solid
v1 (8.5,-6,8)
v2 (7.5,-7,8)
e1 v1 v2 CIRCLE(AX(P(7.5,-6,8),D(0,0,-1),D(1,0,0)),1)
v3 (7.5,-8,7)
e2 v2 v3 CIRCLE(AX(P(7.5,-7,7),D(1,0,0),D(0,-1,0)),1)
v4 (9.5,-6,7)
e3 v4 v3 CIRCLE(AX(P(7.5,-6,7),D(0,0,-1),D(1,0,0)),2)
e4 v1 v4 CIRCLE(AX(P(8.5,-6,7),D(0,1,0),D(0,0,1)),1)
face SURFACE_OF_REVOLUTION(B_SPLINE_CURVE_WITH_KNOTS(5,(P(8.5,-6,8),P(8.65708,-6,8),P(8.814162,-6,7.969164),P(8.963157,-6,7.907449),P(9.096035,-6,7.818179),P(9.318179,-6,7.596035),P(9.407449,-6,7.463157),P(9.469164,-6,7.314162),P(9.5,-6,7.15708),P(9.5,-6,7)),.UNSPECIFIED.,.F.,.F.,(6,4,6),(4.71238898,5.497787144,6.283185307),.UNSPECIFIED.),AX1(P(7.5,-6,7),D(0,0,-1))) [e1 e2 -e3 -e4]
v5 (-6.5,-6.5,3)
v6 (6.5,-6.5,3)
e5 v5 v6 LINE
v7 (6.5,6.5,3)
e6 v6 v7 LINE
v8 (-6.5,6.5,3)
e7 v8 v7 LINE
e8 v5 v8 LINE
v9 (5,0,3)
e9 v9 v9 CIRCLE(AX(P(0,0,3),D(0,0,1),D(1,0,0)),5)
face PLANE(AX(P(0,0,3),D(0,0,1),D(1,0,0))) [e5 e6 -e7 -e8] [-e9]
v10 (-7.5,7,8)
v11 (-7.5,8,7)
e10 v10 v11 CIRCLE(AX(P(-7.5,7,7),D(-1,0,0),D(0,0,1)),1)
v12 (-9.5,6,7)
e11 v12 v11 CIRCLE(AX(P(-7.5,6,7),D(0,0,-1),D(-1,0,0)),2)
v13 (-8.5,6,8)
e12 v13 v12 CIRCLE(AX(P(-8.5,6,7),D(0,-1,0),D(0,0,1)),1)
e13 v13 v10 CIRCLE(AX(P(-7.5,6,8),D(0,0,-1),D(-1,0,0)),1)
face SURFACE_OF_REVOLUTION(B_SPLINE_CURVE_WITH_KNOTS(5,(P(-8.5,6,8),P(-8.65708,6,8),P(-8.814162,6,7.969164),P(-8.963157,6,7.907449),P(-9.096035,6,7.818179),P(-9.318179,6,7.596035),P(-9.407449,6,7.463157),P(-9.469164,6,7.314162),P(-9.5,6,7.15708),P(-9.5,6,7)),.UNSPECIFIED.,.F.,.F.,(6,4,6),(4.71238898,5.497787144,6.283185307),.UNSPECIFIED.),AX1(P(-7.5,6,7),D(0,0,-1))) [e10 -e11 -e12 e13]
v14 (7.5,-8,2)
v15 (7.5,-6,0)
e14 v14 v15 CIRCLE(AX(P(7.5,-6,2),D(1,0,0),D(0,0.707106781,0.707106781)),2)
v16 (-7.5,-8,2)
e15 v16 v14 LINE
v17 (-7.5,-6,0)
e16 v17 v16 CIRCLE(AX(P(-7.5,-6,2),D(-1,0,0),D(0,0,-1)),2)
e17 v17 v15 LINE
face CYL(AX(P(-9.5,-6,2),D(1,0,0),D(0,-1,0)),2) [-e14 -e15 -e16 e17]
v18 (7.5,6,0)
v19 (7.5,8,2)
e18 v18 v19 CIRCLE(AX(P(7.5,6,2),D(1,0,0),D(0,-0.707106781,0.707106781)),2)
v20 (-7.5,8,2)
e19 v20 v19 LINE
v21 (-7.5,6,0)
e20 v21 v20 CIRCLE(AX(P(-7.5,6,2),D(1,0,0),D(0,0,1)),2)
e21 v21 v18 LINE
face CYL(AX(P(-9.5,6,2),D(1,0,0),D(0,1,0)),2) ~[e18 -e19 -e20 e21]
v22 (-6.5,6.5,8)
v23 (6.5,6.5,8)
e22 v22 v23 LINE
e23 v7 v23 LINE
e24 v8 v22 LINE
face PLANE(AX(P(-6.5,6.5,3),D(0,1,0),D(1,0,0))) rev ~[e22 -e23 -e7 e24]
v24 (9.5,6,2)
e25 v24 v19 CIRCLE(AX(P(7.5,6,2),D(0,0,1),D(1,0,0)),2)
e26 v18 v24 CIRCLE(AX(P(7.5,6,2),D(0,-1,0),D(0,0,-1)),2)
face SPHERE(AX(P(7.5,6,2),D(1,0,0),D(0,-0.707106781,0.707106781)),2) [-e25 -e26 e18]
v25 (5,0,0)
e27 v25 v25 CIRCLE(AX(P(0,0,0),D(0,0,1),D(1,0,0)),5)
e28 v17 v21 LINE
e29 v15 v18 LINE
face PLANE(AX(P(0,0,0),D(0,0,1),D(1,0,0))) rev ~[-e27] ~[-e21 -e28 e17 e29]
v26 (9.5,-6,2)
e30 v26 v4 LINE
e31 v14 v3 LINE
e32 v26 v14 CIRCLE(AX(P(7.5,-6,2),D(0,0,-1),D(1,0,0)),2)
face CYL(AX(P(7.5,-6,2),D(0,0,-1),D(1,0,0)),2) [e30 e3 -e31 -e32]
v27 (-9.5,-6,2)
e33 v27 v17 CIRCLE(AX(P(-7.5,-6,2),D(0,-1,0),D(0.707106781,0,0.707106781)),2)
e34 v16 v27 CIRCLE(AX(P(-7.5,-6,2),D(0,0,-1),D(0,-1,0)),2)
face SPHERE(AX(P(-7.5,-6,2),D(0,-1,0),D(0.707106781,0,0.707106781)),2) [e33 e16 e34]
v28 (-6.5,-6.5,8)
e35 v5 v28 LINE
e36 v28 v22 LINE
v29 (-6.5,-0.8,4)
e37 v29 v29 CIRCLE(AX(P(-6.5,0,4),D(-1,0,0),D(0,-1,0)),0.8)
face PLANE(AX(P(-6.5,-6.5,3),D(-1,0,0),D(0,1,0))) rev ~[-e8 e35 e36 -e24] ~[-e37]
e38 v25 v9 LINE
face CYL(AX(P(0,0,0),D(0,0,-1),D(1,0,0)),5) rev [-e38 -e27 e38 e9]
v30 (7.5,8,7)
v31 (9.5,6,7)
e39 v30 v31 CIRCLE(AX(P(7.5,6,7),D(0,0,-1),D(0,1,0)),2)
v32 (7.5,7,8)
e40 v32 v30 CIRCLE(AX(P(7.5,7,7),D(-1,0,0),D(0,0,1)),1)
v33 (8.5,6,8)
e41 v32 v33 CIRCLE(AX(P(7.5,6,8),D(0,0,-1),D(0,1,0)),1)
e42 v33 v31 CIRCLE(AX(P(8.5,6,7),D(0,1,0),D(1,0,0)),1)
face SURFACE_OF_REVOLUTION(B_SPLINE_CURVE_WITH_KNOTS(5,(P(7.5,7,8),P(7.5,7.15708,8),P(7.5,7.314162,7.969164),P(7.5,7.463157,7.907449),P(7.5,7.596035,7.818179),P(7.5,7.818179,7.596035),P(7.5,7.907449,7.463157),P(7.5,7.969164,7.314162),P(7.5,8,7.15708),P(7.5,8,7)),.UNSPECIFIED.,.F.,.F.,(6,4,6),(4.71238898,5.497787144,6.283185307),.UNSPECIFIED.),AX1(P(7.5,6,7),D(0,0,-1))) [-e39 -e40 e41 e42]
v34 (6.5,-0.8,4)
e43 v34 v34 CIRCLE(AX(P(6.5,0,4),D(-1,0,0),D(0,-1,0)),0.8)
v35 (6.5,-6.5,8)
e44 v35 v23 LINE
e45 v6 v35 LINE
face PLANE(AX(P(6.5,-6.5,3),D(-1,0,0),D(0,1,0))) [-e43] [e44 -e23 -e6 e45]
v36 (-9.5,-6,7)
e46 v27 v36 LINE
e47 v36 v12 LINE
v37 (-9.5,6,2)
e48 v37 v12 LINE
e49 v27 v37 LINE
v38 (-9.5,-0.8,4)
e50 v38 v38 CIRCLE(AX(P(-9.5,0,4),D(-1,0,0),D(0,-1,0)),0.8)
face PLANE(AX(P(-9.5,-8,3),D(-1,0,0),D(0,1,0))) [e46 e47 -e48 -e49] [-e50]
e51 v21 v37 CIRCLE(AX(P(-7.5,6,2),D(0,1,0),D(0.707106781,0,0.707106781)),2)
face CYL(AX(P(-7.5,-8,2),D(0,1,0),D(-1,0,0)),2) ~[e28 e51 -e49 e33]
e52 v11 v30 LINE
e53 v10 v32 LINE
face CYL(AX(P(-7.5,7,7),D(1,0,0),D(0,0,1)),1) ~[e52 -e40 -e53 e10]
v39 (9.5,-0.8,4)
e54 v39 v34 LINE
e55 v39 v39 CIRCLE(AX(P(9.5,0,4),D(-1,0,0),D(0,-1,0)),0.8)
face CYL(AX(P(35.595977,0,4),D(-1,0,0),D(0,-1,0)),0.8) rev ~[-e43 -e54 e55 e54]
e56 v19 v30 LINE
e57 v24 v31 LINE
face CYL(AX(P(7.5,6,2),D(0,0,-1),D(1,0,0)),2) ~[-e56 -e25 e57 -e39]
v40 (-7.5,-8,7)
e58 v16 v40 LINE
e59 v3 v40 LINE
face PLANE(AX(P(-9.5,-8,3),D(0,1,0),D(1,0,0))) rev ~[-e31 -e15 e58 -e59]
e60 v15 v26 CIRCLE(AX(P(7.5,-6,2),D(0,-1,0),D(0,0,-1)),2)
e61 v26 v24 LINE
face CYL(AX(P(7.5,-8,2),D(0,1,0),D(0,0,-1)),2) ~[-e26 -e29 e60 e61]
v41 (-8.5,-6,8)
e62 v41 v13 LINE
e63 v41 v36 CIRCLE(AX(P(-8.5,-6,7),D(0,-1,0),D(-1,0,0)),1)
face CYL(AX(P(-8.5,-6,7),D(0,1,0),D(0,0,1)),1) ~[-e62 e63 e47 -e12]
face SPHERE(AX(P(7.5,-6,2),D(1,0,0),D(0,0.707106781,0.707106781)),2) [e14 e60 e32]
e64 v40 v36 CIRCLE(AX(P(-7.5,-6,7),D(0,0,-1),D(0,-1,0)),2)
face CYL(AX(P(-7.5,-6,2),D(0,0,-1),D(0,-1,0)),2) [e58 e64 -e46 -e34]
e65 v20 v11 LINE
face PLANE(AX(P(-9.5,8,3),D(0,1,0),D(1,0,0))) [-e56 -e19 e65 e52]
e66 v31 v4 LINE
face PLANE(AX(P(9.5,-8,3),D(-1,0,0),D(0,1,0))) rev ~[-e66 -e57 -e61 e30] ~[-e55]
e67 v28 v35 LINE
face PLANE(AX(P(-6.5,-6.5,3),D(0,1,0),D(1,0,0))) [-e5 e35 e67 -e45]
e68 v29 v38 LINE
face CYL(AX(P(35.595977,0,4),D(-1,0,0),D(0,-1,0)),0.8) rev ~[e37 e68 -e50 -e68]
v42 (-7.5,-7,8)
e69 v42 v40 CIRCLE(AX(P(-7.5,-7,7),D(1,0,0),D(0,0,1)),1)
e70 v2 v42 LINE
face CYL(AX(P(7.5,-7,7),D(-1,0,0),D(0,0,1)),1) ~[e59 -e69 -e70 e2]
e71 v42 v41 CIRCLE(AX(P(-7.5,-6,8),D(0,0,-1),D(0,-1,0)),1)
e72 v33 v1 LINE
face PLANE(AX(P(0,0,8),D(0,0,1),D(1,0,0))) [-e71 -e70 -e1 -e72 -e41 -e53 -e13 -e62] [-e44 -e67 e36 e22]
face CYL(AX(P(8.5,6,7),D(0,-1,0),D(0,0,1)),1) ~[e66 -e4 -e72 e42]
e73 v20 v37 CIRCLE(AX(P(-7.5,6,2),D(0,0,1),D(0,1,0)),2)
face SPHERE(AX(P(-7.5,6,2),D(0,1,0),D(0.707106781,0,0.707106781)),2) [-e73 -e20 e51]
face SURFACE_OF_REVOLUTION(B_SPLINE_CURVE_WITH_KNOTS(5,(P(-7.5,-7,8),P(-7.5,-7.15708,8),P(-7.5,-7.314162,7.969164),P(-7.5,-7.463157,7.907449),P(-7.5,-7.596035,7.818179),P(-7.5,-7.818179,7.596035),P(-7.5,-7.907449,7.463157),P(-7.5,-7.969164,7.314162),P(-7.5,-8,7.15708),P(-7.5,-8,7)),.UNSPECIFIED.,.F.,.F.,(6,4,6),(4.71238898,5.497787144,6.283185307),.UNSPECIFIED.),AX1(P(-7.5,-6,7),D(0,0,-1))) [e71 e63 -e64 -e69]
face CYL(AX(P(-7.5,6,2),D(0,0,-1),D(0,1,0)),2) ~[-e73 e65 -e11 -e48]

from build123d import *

# Parameters (mm, degrees)
F0_W         = 19
F0_H         = 16
F0_W_2       = 13
F0_H_2       = 13
F0_R         = 5
F1_DEPTH     = 3
F2_W         = 19
F2_H         = 16
F2_W_2       = 13
F2_H_2       = 13
F3_DEPTH     = 5
F5_D         = 1.6
F6_R         = 2
F7_T1_DEPTH  = 11
F7_S5_W      = 2
F7_S5_H      = 2
F7_T6_DEPTH  = 2
F7_S11_W     = 2
F7_S11_H     = 2
F7_T12_DEPTH = 2
F7_S17_W     = 2
F7_S17_H     = 2
F7_T18_DEPTH = 2
F7_S23_W     = 2
F7_S23_H     = 2
F7_T24_DEPTH = 2
F8_R         = 1


# Not quite as in the source:
# - a fillet or chamfer that OpenCascade refuses, or shapes differently, is made with other operations: its cross-section is extruded or revolved along the edge and cut away or added


with BuildPart() as f1:
    # F0 (on Top) → F1 (new body)
    with BuildSketch(Plane.XY):
        Rectangle(F0_W, F0_H)
        Rectangle(F0_W_2, F0_H_2, mode=Mode.SUBTRACT)
        Rectangle(F0_W_2, F0_H_2)
        Circle(F0_R, mode=Mode.SUBTRACT)
    extrude(amount=F1_DEPTH)

    # F2 (on face) → F3 (join)
    with BuildSketch(Plane.XY.offset(3)):
        Rectangle(F2_W, F2_H)
        Rectangle(F2_W_2, F2_H_2, mode=Mode.SUBTRACT)
    extrude(amount=F3_DEPTH)

    # F5 (through all)
    with Locations(Plane.YZ.offset(9.5)):
        with Locations((0, 4)):
            Hole(F5_D / 2)

    # F6
    f6_edges = [f1.edges().sort_by_distance(p)[0] for p in [
        (0, -8, 0),
        (0, 8, 0),
        (-9.5, 0, 0),
        (9.5, 0, 0),
    ]]
    fillet(f6_edges, radius=F6_R)

    # F7: fillet of radius 2 on 4 edges, made by hand

    # F7_s2 → F7_t1 (cut)
    with BuildSketch(Plane.XY.offset(2)):
        with BuildLine():
            ThreePointArc((9.5, -6), (8.9142135624, -7.4142135624), (7.5, -8))
            Line((7.5, -8), (9.5, -8))
            Line((9.5, -8), (9.5, -6))
        make_face()
        with BuildLine():
            ThreePointArc((9.5, 6), (8.9142135624, 7.4142135624), (7.5, 8))
            Line((7.5, 8), (9.5, 8))
            Line((9.5, 8), (9.5, 6))
        make_face()
        with BuildLine():
            ThreePointArc((-7.5, -8), (-8.9142135624, -7.4142135624), (-9.5, -6))
            Line((-9.5, -6), (-9.5, -8))
            Line((-9.5, -8), (-7.5, -8))
        make_face()
        with BuildLine():
            ThreePointArc((-7.5, 8), (-8.9142135624, 7.4142135624), (-9.5, 6))
            Line((-9.5, 6), (-9.5, 8))
            Line((-9.5, 8), (-7.5, 8))
        make_face()
    extrude(amount=F7_T1_DEPTH, mode=Mode.SUBTRACT)


with BuildPart() as f7_tool4:
    # F7_s5 → F7_t6 (new body)
    with BuildSketch(Plane.XZ.offset(-6)):
        with Locations((-8.5, 1)):
            Rectangle(F7_S5_W, F7_S5_H)
    extrude(amount=-F7_T6_DEPTH)

    # F7_s7 → F7_t8 (revolve, cut)
    with BuildSketch(Plane(origin=(-7.5, 6, 2), x_dir=(0.7071067812, 0, 0.7071067812), z_dir=(-0.7071067812, 0, 0.7071067812))):
        with BuildLine():
            ThreePointArc((0, -2), (2, 0), (0, 2))
            Line((0, 2), (0, -2))
        make_face()
    revolve(axis=Axis((-7.5, 6, 2), (0, 1, 0)), mode=Mode.SUBTRACT)


with BuildPart() as f1_1:
    add(f1.part)

    # F7_t3: cut F7_tool4
    add(f7_tool4.part, mode=Mode.SUBTRACT)


with BuildPart() as f7_tool10:
    # F7_s11 → F7_t12 (new body)
    with BuildSketch(Plane.XZ.offset(6)):
        with Locations((-8.5, 1)):
            Rectangle(F7_S11_W, F7_S11_H)
    extrude(amount=F7_T12_DEPTH)

    # F7_s13 → F7_t14 (revolve, cut)
    with BuildSketch(Plane(origin=(-7.5, -6, 2), x_dir=(0.7071067812, 0, 0.7071067812), z_dir=(0.7071067812, 0, -0.7071067812))):
        with BuildLine():
            ThreePointArc((0, -2), (2, 0), (0, 2))
            Line((0, 2), (0, -2))
        make_face()
    revolve(axis=Axis((-7.5, -6, 2), (0, -1, 0)), mode=Mode.SUBTRACT)


with BuildPart() as f1_2:
    add(f1_1.part)

    # F7_t9: cut F7_tool10
    add(f7_tool10.part, mode=Mode.SUBTRACT)


with BuildPart() as f7_tool16:
    # F7_s17 → F7_t18 (new body)
    with BuildSketch(Plane.YZ.offset(7.5)):
        with Locations((7, 1)):
            Rectangle(F7_S17_W, F7_S17_H)
    extrude(amount=F7_T18_DEPTH)

    # F7_s19 → F7_t20 (revolve, cut)
    with BuildSketch(Plane(origin=(7.5, 6, 2), x_dir=(0, -0.7071067812, 0.7071067812), z_dir=(0, 0.7071067812, 0.7071067812))):
        with BuildLine():
            ThreePointArc((0, -2), (2, 0), (0, 2))
            Line((0, 2), (0, -2))
        make_face()
    revolve(axis=Axis((7.5, 6, 2), (1, 0, 0)), mode=Mode.SUBTRACT)


with BuildPart() as f1_3:
    add(f1_2.part)

    # F7_t15: cut F7_tool16
    add(f7_tool16.part, mode=Mode.SUBTRACT)


with BuildPart() as f7_tool22:
    # F7_s23 → F7_t24 (new body)
    with BuildSketch(Plane.YZ.offset(7.5)):
        with Locations((-7, 1)):
            Rectangle(F7_S23_W, F7_S23_H)
    extrude(amount=F7_T24_DEPTH)

    # F7_s25 → F7_t26 (revolve, cut)
    with BuildSketch(Plane(origin=(7.5, -6, 2), x_dir=(0, 0.7071067812, 0.7071067812), z_dir=(0, 0.7071067812, -0.7071067812))):
        with BuildLine():
            ThreePointArc((0, -2), (2, 0), (0, 2))
            Line((0, 2), (0, -2))
        make_face()
    revolve(axis=Axis((7.5, -6, 2), (1, 0, 0)), mode=Mode.SUBTRACT)


with BuildPart() as f1_4:
    add(f1_3.part)

    # F7_t21: cut F7_tool22
    add(f7_tool22.part, mode=Mode.SUBTRACT)

    # F8
    f8_edges = [f1_4.edges().sort_by_distance(p)[0] for p in [
        (0, 8, 8),
    ]]
    fillet(f8_edges, radius=F8_R)


solid = f1_4.part
